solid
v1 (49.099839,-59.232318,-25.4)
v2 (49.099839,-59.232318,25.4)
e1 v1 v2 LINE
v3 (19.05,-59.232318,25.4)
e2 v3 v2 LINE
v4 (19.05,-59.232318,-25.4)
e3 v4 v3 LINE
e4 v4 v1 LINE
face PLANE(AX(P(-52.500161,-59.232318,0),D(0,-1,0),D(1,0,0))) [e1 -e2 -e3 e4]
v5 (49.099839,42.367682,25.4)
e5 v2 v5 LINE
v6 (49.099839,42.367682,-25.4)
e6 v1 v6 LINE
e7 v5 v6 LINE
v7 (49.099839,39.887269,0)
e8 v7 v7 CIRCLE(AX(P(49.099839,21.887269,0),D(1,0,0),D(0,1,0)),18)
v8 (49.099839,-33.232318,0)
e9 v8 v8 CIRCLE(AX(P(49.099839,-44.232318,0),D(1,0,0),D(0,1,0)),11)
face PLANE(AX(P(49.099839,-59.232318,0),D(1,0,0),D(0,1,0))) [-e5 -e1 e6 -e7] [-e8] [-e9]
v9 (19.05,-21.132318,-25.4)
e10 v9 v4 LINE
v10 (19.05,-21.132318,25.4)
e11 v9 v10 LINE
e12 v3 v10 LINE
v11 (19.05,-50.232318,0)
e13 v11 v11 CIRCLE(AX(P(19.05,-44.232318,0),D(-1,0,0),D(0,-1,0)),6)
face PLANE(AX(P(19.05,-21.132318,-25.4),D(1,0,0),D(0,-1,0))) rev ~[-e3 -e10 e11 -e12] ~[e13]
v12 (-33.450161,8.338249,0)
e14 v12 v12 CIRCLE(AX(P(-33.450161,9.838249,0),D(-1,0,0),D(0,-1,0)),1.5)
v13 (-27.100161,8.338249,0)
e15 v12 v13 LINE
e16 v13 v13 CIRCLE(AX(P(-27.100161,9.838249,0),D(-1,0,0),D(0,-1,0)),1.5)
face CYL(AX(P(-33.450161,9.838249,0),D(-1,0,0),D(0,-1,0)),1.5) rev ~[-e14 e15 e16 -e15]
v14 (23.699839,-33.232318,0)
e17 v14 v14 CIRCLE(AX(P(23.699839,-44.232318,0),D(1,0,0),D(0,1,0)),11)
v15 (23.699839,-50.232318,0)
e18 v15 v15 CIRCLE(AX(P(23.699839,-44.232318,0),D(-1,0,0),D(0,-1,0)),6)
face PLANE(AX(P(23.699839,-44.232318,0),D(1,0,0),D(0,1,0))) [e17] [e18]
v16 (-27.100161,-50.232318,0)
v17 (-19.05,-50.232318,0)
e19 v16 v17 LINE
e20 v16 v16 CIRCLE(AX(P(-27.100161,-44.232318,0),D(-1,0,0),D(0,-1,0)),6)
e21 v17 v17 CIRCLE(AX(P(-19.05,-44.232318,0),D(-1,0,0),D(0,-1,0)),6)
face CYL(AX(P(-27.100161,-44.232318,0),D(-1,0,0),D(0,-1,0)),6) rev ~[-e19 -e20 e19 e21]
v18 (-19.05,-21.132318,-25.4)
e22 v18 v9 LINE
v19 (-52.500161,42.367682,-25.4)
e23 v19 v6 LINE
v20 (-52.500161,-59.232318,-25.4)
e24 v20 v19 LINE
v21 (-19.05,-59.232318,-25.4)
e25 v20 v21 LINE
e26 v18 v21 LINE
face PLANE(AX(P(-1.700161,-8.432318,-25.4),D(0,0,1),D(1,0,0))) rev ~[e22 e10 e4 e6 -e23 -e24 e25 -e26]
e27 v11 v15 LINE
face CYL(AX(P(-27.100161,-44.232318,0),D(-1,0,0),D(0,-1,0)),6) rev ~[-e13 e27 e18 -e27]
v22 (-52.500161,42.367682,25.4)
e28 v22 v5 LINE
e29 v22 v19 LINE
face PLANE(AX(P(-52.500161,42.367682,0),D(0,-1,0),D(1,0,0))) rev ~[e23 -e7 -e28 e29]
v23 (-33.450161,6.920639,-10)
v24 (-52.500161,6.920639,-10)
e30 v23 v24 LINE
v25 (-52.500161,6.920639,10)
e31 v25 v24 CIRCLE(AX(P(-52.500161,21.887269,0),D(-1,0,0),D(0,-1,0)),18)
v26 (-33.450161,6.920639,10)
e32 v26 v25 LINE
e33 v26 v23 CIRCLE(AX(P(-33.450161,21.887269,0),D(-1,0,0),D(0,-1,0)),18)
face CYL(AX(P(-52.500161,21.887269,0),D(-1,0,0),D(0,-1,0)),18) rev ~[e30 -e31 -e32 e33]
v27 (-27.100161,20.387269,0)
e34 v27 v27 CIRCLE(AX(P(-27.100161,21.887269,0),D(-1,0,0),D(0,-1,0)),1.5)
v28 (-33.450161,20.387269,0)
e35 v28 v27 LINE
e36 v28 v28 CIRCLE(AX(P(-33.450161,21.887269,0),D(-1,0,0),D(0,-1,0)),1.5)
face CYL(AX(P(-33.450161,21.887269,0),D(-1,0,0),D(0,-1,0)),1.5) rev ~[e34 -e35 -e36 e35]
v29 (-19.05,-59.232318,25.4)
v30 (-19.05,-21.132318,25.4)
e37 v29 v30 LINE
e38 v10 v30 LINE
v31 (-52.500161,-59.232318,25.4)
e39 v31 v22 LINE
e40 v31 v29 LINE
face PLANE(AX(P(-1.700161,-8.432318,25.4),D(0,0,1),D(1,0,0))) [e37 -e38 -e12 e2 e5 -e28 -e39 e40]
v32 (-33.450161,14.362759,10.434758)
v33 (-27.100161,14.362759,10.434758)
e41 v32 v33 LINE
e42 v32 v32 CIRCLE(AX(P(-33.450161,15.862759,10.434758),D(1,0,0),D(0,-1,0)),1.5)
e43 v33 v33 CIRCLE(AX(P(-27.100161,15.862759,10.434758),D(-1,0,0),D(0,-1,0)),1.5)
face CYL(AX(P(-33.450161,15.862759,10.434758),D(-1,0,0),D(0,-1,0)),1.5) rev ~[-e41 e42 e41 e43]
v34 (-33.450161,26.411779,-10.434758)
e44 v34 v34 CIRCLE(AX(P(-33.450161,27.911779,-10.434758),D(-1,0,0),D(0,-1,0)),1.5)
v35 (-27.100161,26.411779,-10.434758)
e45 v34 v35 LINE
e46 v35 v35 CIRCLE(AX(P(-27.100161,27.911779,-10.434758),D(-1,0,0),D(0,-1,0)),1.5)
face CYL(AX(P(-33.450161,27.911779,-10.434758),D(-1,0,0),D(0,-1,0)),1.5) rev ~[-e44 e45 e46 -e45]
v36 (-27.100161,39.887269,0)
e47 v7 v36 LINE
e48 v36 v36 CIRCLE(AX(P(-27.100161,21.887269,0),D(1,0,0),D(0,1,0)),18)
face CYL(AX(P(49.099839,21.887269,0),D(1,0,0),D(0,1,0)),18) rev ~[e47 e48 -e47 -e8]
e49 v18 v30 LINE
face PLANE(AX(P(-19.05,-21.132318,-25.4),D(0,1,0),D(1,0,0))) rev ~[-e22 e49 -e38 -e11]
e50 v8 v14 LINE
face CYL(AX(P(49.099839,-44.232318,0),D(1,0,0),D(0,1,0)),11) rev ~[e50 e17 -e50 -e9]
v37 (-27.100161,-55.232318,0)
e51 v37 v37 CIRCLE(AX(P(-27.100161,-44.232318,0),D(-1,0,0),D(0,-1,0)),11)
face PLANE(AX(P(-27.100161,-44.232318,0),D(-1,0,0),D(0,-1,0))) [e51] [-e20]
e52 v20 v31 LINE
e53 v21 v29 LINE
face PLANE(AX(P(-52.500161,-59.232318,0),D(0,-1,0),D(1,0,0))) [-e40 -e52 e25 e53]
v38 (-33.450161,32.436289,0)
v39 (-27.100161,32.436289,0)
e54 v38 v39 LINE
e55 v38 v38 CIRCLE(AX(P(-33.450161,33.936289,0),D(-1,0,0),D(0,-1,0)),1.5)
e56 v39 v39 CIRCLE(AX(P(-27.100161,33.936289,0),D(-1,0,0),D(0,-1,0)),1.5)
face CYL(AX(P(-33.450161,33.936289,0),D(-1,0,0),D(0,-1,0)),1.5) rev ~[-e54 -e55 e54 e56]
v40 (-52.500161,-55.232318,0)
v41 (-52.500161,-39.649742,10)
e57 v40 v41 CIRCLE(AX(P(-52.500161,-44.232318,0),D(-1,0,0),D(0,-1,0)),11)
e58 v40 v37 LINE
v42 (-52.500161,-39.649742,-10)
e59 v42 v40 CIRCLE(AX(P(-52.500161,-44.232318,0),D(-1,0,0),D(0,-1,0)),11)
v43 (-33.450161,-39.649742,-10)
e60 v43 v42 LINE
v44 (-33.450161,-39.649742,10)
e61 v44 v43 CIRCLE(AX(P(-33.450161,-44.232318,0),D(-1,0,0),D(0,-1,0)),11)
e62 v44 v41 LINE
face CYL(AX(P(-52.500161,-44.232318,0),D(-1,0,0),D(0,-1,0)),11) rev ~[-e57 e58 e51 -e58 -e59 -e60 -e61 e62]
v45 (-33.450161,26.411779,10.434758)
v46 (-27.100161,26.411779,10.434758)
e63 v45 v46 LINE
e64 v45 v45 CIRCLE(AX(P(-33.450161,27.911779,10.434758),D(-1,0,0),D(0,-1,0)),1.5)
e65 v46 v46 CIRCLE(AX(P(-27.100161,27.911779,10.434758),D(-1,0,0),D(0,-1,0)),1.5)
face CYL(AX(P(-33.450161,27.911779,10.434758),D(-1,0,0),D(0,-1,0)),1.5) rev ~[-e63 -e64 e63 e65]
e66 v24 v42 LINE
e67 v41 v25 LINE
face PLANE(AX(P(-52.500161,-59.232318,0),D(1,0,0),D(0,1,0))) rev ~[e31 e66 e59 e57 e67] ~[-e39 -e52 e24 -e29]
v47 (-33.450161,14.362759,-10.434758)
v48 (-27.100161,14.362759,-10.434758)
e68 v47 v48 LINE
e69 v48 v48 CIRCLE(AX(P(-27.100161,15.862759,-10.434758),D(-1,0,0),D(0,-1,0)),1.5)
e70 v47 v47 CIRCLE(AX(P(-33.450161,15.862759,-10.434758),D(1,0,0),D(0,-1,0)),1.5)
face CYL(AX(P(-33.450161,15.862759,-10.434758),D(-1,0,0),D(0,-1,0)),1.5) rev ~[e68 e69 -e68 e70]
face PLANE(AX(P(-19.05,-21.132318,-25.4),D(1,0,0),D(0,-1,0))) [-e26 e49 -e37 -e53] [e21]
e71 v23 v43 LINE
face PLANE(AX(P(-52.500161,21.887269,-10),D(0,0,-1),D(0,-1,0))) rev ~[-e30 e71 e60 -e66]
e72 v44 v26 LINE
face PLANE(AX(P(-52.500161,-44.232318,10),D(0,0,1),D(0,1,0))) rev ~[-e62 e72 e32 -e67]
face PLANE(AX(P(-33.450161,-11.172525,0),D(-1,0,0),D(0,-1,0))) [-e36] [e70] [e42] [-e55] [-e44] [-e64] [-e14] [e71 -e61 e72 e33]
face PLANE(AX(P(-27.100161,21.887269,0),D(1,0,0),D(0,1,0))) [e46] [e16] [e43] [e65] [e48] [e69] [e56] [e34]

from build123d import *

# Parameters (mm, degrees)
F0_W      = 101.6
F0_H      = 101.6
F1_DEPTH  = 25.4
F2_R      = 18
F3_DEPTH  = 76.2
F4_R      = 18
F5_DEPTH  = 19.05
F6_R      = 1.5
F7_DEPTH  = 25
F8_R      = 11
F9_DEPTH  = 25.4
F10_R     = 11
F11_DEPTH = 25.4
F12_W     = 38.1
F12_H     = 43.3616997044
F13_DEPTH = 50.801
F14_R     = 6
F15_DEPTH = 76.201
F17_DEPTH = 19.05


# Not quite as in the source:
# - a length typed as a fraction of an inch, garbled in the dataset ("3 / 203.2 mm" for 3/8 in), is restored


with BuildPart() as f1:
    # F0 (on Top) → F1 (new body, symmetric)
    with BuildSketch(Plane.XY):
        with Locations((-1.7001610249, -8.4323180143)):
            Rectangle(F0_W, F0_H)
    extrude(amount=F1_DEPTH, both=True)

    # F2 (on face) → F3 (cut)
    with BuildSketch(Plane.YZ.offset(49.0998389751)):
        with Locations((21.8872688711, 0)):
            Circle(F2_R)
    extrude(amount=-F3_DEPTH, mode=Mode.SUBTRACT)

    # F4 (on face) → F5 (cut)
    with BuildSketch(Plane(origin=(-52.5001610249, 0, 0), x_dir=(0, -1, 0), z_dir=(-1, 0, 0))):
        with Locations((-21.8872688711, 0)):
            Circle(F4_R)
    extrude(amount=-F5_DEPTH, mode=Mode.SUBTRACT)

    # F6 (on face) → F7 (cut)
    with BuildSketch(Plane(origin=(-33.4501610249, 0, 0), x_dir=(0, -1, 0), z_dir=(-1, 0, 0))):
        with Locations((-21.8872688711, 0)):
            Circle(F6_R)
        with Locations((-9.838248603, 0)):
            Circle(F6_R)
        with Locations((-15.8627587371, 10.4347576428)):
            Circle(F6_R)
        with Locations((-27.9117790051, 10.4347576428)):
            Circle(F6_R)
        with Locations((-33.9362891391, 0)):
            Circle(F6_R)
        with Locations((-27.9117790051, -10.4347576428)):
            Circle(F6_R)
        with Locations((-15.8627587371, -10.4347576428)):
            Circle(F6_R)
    extrude(amount=-F7_DEPTH, mode=Mode.SUBTRACT)

    # F8 (on face) → F9 (cut)
    with BuildSketch(Plane(origin=(-52.5001610249, 0, 0), x_dir=(0, -1, 0), z_dir=(-1, 0, 0))):
        with Locations((44.2323180143, 0)):
            Circle(F8_R)
    extrude(amount=-F9_DEPTH, mode=Mode.SUBTRACT)

    # F10 (on face) → F11 (cut)
    with BuildSketch(Plane.YZ.offset(49.0998389751)):
        with Locations((-44.2323180143, 0)):
            Circle(F10_R)
    extrude(amount=-F11_DEPTH, mode=Mode.SUBTRACT)

    # F12 (on face) → F13 (cut, through all)
    with BuildSketch(Plane(origin=(0, 0, -25.4), x_dir=(1, 0, 0), z_dir=(0, 0, -1))):
        with Locations((0, 42.8131678666)):
            Rectangle(F12_W, F12_H)
    extrude(amount=-F13_DEPTH, mode=Mode.SUBTRACT)

    # F14 (on face) → F15 (cut, through all)
    with BuildSketch(Plane(origin=(-27.1001610249, 0, 0), x_dir=(0, -1, 0), z_dir=(-1, 0, 0))):
        with Locations((44.2323180143, 0)):
            Circle(F14_R)
    extrude(amount=-F15_DEPTH, mode=Mode.SUBTRACT)

    # F16 (on face) → F17 (cut)
    with BuildSketch(Plane(origin=(-52.5001610249, 0, 0), x_dir=(0, -1, 0), z_dir=(-1, 0, 0))):
        with BuildLine():
            Line((-21.8872688711, -10), (44.2323180143, -10))
            ThreePointArc((44.2323180143, -10), (54.2323180143, 0), (44.2323180143, 10))
            Line((44.2323180143, 10), (-21.8872688711, 10))
            ThreePointArc((-21.8872688711, 10), (-31.8872688711, 0), (-21.8872688711, -10))
        make_face()
    extrude(amount=-F17_DEPTH, mode=Mode.SUBTRACT)


solid = f1.part
